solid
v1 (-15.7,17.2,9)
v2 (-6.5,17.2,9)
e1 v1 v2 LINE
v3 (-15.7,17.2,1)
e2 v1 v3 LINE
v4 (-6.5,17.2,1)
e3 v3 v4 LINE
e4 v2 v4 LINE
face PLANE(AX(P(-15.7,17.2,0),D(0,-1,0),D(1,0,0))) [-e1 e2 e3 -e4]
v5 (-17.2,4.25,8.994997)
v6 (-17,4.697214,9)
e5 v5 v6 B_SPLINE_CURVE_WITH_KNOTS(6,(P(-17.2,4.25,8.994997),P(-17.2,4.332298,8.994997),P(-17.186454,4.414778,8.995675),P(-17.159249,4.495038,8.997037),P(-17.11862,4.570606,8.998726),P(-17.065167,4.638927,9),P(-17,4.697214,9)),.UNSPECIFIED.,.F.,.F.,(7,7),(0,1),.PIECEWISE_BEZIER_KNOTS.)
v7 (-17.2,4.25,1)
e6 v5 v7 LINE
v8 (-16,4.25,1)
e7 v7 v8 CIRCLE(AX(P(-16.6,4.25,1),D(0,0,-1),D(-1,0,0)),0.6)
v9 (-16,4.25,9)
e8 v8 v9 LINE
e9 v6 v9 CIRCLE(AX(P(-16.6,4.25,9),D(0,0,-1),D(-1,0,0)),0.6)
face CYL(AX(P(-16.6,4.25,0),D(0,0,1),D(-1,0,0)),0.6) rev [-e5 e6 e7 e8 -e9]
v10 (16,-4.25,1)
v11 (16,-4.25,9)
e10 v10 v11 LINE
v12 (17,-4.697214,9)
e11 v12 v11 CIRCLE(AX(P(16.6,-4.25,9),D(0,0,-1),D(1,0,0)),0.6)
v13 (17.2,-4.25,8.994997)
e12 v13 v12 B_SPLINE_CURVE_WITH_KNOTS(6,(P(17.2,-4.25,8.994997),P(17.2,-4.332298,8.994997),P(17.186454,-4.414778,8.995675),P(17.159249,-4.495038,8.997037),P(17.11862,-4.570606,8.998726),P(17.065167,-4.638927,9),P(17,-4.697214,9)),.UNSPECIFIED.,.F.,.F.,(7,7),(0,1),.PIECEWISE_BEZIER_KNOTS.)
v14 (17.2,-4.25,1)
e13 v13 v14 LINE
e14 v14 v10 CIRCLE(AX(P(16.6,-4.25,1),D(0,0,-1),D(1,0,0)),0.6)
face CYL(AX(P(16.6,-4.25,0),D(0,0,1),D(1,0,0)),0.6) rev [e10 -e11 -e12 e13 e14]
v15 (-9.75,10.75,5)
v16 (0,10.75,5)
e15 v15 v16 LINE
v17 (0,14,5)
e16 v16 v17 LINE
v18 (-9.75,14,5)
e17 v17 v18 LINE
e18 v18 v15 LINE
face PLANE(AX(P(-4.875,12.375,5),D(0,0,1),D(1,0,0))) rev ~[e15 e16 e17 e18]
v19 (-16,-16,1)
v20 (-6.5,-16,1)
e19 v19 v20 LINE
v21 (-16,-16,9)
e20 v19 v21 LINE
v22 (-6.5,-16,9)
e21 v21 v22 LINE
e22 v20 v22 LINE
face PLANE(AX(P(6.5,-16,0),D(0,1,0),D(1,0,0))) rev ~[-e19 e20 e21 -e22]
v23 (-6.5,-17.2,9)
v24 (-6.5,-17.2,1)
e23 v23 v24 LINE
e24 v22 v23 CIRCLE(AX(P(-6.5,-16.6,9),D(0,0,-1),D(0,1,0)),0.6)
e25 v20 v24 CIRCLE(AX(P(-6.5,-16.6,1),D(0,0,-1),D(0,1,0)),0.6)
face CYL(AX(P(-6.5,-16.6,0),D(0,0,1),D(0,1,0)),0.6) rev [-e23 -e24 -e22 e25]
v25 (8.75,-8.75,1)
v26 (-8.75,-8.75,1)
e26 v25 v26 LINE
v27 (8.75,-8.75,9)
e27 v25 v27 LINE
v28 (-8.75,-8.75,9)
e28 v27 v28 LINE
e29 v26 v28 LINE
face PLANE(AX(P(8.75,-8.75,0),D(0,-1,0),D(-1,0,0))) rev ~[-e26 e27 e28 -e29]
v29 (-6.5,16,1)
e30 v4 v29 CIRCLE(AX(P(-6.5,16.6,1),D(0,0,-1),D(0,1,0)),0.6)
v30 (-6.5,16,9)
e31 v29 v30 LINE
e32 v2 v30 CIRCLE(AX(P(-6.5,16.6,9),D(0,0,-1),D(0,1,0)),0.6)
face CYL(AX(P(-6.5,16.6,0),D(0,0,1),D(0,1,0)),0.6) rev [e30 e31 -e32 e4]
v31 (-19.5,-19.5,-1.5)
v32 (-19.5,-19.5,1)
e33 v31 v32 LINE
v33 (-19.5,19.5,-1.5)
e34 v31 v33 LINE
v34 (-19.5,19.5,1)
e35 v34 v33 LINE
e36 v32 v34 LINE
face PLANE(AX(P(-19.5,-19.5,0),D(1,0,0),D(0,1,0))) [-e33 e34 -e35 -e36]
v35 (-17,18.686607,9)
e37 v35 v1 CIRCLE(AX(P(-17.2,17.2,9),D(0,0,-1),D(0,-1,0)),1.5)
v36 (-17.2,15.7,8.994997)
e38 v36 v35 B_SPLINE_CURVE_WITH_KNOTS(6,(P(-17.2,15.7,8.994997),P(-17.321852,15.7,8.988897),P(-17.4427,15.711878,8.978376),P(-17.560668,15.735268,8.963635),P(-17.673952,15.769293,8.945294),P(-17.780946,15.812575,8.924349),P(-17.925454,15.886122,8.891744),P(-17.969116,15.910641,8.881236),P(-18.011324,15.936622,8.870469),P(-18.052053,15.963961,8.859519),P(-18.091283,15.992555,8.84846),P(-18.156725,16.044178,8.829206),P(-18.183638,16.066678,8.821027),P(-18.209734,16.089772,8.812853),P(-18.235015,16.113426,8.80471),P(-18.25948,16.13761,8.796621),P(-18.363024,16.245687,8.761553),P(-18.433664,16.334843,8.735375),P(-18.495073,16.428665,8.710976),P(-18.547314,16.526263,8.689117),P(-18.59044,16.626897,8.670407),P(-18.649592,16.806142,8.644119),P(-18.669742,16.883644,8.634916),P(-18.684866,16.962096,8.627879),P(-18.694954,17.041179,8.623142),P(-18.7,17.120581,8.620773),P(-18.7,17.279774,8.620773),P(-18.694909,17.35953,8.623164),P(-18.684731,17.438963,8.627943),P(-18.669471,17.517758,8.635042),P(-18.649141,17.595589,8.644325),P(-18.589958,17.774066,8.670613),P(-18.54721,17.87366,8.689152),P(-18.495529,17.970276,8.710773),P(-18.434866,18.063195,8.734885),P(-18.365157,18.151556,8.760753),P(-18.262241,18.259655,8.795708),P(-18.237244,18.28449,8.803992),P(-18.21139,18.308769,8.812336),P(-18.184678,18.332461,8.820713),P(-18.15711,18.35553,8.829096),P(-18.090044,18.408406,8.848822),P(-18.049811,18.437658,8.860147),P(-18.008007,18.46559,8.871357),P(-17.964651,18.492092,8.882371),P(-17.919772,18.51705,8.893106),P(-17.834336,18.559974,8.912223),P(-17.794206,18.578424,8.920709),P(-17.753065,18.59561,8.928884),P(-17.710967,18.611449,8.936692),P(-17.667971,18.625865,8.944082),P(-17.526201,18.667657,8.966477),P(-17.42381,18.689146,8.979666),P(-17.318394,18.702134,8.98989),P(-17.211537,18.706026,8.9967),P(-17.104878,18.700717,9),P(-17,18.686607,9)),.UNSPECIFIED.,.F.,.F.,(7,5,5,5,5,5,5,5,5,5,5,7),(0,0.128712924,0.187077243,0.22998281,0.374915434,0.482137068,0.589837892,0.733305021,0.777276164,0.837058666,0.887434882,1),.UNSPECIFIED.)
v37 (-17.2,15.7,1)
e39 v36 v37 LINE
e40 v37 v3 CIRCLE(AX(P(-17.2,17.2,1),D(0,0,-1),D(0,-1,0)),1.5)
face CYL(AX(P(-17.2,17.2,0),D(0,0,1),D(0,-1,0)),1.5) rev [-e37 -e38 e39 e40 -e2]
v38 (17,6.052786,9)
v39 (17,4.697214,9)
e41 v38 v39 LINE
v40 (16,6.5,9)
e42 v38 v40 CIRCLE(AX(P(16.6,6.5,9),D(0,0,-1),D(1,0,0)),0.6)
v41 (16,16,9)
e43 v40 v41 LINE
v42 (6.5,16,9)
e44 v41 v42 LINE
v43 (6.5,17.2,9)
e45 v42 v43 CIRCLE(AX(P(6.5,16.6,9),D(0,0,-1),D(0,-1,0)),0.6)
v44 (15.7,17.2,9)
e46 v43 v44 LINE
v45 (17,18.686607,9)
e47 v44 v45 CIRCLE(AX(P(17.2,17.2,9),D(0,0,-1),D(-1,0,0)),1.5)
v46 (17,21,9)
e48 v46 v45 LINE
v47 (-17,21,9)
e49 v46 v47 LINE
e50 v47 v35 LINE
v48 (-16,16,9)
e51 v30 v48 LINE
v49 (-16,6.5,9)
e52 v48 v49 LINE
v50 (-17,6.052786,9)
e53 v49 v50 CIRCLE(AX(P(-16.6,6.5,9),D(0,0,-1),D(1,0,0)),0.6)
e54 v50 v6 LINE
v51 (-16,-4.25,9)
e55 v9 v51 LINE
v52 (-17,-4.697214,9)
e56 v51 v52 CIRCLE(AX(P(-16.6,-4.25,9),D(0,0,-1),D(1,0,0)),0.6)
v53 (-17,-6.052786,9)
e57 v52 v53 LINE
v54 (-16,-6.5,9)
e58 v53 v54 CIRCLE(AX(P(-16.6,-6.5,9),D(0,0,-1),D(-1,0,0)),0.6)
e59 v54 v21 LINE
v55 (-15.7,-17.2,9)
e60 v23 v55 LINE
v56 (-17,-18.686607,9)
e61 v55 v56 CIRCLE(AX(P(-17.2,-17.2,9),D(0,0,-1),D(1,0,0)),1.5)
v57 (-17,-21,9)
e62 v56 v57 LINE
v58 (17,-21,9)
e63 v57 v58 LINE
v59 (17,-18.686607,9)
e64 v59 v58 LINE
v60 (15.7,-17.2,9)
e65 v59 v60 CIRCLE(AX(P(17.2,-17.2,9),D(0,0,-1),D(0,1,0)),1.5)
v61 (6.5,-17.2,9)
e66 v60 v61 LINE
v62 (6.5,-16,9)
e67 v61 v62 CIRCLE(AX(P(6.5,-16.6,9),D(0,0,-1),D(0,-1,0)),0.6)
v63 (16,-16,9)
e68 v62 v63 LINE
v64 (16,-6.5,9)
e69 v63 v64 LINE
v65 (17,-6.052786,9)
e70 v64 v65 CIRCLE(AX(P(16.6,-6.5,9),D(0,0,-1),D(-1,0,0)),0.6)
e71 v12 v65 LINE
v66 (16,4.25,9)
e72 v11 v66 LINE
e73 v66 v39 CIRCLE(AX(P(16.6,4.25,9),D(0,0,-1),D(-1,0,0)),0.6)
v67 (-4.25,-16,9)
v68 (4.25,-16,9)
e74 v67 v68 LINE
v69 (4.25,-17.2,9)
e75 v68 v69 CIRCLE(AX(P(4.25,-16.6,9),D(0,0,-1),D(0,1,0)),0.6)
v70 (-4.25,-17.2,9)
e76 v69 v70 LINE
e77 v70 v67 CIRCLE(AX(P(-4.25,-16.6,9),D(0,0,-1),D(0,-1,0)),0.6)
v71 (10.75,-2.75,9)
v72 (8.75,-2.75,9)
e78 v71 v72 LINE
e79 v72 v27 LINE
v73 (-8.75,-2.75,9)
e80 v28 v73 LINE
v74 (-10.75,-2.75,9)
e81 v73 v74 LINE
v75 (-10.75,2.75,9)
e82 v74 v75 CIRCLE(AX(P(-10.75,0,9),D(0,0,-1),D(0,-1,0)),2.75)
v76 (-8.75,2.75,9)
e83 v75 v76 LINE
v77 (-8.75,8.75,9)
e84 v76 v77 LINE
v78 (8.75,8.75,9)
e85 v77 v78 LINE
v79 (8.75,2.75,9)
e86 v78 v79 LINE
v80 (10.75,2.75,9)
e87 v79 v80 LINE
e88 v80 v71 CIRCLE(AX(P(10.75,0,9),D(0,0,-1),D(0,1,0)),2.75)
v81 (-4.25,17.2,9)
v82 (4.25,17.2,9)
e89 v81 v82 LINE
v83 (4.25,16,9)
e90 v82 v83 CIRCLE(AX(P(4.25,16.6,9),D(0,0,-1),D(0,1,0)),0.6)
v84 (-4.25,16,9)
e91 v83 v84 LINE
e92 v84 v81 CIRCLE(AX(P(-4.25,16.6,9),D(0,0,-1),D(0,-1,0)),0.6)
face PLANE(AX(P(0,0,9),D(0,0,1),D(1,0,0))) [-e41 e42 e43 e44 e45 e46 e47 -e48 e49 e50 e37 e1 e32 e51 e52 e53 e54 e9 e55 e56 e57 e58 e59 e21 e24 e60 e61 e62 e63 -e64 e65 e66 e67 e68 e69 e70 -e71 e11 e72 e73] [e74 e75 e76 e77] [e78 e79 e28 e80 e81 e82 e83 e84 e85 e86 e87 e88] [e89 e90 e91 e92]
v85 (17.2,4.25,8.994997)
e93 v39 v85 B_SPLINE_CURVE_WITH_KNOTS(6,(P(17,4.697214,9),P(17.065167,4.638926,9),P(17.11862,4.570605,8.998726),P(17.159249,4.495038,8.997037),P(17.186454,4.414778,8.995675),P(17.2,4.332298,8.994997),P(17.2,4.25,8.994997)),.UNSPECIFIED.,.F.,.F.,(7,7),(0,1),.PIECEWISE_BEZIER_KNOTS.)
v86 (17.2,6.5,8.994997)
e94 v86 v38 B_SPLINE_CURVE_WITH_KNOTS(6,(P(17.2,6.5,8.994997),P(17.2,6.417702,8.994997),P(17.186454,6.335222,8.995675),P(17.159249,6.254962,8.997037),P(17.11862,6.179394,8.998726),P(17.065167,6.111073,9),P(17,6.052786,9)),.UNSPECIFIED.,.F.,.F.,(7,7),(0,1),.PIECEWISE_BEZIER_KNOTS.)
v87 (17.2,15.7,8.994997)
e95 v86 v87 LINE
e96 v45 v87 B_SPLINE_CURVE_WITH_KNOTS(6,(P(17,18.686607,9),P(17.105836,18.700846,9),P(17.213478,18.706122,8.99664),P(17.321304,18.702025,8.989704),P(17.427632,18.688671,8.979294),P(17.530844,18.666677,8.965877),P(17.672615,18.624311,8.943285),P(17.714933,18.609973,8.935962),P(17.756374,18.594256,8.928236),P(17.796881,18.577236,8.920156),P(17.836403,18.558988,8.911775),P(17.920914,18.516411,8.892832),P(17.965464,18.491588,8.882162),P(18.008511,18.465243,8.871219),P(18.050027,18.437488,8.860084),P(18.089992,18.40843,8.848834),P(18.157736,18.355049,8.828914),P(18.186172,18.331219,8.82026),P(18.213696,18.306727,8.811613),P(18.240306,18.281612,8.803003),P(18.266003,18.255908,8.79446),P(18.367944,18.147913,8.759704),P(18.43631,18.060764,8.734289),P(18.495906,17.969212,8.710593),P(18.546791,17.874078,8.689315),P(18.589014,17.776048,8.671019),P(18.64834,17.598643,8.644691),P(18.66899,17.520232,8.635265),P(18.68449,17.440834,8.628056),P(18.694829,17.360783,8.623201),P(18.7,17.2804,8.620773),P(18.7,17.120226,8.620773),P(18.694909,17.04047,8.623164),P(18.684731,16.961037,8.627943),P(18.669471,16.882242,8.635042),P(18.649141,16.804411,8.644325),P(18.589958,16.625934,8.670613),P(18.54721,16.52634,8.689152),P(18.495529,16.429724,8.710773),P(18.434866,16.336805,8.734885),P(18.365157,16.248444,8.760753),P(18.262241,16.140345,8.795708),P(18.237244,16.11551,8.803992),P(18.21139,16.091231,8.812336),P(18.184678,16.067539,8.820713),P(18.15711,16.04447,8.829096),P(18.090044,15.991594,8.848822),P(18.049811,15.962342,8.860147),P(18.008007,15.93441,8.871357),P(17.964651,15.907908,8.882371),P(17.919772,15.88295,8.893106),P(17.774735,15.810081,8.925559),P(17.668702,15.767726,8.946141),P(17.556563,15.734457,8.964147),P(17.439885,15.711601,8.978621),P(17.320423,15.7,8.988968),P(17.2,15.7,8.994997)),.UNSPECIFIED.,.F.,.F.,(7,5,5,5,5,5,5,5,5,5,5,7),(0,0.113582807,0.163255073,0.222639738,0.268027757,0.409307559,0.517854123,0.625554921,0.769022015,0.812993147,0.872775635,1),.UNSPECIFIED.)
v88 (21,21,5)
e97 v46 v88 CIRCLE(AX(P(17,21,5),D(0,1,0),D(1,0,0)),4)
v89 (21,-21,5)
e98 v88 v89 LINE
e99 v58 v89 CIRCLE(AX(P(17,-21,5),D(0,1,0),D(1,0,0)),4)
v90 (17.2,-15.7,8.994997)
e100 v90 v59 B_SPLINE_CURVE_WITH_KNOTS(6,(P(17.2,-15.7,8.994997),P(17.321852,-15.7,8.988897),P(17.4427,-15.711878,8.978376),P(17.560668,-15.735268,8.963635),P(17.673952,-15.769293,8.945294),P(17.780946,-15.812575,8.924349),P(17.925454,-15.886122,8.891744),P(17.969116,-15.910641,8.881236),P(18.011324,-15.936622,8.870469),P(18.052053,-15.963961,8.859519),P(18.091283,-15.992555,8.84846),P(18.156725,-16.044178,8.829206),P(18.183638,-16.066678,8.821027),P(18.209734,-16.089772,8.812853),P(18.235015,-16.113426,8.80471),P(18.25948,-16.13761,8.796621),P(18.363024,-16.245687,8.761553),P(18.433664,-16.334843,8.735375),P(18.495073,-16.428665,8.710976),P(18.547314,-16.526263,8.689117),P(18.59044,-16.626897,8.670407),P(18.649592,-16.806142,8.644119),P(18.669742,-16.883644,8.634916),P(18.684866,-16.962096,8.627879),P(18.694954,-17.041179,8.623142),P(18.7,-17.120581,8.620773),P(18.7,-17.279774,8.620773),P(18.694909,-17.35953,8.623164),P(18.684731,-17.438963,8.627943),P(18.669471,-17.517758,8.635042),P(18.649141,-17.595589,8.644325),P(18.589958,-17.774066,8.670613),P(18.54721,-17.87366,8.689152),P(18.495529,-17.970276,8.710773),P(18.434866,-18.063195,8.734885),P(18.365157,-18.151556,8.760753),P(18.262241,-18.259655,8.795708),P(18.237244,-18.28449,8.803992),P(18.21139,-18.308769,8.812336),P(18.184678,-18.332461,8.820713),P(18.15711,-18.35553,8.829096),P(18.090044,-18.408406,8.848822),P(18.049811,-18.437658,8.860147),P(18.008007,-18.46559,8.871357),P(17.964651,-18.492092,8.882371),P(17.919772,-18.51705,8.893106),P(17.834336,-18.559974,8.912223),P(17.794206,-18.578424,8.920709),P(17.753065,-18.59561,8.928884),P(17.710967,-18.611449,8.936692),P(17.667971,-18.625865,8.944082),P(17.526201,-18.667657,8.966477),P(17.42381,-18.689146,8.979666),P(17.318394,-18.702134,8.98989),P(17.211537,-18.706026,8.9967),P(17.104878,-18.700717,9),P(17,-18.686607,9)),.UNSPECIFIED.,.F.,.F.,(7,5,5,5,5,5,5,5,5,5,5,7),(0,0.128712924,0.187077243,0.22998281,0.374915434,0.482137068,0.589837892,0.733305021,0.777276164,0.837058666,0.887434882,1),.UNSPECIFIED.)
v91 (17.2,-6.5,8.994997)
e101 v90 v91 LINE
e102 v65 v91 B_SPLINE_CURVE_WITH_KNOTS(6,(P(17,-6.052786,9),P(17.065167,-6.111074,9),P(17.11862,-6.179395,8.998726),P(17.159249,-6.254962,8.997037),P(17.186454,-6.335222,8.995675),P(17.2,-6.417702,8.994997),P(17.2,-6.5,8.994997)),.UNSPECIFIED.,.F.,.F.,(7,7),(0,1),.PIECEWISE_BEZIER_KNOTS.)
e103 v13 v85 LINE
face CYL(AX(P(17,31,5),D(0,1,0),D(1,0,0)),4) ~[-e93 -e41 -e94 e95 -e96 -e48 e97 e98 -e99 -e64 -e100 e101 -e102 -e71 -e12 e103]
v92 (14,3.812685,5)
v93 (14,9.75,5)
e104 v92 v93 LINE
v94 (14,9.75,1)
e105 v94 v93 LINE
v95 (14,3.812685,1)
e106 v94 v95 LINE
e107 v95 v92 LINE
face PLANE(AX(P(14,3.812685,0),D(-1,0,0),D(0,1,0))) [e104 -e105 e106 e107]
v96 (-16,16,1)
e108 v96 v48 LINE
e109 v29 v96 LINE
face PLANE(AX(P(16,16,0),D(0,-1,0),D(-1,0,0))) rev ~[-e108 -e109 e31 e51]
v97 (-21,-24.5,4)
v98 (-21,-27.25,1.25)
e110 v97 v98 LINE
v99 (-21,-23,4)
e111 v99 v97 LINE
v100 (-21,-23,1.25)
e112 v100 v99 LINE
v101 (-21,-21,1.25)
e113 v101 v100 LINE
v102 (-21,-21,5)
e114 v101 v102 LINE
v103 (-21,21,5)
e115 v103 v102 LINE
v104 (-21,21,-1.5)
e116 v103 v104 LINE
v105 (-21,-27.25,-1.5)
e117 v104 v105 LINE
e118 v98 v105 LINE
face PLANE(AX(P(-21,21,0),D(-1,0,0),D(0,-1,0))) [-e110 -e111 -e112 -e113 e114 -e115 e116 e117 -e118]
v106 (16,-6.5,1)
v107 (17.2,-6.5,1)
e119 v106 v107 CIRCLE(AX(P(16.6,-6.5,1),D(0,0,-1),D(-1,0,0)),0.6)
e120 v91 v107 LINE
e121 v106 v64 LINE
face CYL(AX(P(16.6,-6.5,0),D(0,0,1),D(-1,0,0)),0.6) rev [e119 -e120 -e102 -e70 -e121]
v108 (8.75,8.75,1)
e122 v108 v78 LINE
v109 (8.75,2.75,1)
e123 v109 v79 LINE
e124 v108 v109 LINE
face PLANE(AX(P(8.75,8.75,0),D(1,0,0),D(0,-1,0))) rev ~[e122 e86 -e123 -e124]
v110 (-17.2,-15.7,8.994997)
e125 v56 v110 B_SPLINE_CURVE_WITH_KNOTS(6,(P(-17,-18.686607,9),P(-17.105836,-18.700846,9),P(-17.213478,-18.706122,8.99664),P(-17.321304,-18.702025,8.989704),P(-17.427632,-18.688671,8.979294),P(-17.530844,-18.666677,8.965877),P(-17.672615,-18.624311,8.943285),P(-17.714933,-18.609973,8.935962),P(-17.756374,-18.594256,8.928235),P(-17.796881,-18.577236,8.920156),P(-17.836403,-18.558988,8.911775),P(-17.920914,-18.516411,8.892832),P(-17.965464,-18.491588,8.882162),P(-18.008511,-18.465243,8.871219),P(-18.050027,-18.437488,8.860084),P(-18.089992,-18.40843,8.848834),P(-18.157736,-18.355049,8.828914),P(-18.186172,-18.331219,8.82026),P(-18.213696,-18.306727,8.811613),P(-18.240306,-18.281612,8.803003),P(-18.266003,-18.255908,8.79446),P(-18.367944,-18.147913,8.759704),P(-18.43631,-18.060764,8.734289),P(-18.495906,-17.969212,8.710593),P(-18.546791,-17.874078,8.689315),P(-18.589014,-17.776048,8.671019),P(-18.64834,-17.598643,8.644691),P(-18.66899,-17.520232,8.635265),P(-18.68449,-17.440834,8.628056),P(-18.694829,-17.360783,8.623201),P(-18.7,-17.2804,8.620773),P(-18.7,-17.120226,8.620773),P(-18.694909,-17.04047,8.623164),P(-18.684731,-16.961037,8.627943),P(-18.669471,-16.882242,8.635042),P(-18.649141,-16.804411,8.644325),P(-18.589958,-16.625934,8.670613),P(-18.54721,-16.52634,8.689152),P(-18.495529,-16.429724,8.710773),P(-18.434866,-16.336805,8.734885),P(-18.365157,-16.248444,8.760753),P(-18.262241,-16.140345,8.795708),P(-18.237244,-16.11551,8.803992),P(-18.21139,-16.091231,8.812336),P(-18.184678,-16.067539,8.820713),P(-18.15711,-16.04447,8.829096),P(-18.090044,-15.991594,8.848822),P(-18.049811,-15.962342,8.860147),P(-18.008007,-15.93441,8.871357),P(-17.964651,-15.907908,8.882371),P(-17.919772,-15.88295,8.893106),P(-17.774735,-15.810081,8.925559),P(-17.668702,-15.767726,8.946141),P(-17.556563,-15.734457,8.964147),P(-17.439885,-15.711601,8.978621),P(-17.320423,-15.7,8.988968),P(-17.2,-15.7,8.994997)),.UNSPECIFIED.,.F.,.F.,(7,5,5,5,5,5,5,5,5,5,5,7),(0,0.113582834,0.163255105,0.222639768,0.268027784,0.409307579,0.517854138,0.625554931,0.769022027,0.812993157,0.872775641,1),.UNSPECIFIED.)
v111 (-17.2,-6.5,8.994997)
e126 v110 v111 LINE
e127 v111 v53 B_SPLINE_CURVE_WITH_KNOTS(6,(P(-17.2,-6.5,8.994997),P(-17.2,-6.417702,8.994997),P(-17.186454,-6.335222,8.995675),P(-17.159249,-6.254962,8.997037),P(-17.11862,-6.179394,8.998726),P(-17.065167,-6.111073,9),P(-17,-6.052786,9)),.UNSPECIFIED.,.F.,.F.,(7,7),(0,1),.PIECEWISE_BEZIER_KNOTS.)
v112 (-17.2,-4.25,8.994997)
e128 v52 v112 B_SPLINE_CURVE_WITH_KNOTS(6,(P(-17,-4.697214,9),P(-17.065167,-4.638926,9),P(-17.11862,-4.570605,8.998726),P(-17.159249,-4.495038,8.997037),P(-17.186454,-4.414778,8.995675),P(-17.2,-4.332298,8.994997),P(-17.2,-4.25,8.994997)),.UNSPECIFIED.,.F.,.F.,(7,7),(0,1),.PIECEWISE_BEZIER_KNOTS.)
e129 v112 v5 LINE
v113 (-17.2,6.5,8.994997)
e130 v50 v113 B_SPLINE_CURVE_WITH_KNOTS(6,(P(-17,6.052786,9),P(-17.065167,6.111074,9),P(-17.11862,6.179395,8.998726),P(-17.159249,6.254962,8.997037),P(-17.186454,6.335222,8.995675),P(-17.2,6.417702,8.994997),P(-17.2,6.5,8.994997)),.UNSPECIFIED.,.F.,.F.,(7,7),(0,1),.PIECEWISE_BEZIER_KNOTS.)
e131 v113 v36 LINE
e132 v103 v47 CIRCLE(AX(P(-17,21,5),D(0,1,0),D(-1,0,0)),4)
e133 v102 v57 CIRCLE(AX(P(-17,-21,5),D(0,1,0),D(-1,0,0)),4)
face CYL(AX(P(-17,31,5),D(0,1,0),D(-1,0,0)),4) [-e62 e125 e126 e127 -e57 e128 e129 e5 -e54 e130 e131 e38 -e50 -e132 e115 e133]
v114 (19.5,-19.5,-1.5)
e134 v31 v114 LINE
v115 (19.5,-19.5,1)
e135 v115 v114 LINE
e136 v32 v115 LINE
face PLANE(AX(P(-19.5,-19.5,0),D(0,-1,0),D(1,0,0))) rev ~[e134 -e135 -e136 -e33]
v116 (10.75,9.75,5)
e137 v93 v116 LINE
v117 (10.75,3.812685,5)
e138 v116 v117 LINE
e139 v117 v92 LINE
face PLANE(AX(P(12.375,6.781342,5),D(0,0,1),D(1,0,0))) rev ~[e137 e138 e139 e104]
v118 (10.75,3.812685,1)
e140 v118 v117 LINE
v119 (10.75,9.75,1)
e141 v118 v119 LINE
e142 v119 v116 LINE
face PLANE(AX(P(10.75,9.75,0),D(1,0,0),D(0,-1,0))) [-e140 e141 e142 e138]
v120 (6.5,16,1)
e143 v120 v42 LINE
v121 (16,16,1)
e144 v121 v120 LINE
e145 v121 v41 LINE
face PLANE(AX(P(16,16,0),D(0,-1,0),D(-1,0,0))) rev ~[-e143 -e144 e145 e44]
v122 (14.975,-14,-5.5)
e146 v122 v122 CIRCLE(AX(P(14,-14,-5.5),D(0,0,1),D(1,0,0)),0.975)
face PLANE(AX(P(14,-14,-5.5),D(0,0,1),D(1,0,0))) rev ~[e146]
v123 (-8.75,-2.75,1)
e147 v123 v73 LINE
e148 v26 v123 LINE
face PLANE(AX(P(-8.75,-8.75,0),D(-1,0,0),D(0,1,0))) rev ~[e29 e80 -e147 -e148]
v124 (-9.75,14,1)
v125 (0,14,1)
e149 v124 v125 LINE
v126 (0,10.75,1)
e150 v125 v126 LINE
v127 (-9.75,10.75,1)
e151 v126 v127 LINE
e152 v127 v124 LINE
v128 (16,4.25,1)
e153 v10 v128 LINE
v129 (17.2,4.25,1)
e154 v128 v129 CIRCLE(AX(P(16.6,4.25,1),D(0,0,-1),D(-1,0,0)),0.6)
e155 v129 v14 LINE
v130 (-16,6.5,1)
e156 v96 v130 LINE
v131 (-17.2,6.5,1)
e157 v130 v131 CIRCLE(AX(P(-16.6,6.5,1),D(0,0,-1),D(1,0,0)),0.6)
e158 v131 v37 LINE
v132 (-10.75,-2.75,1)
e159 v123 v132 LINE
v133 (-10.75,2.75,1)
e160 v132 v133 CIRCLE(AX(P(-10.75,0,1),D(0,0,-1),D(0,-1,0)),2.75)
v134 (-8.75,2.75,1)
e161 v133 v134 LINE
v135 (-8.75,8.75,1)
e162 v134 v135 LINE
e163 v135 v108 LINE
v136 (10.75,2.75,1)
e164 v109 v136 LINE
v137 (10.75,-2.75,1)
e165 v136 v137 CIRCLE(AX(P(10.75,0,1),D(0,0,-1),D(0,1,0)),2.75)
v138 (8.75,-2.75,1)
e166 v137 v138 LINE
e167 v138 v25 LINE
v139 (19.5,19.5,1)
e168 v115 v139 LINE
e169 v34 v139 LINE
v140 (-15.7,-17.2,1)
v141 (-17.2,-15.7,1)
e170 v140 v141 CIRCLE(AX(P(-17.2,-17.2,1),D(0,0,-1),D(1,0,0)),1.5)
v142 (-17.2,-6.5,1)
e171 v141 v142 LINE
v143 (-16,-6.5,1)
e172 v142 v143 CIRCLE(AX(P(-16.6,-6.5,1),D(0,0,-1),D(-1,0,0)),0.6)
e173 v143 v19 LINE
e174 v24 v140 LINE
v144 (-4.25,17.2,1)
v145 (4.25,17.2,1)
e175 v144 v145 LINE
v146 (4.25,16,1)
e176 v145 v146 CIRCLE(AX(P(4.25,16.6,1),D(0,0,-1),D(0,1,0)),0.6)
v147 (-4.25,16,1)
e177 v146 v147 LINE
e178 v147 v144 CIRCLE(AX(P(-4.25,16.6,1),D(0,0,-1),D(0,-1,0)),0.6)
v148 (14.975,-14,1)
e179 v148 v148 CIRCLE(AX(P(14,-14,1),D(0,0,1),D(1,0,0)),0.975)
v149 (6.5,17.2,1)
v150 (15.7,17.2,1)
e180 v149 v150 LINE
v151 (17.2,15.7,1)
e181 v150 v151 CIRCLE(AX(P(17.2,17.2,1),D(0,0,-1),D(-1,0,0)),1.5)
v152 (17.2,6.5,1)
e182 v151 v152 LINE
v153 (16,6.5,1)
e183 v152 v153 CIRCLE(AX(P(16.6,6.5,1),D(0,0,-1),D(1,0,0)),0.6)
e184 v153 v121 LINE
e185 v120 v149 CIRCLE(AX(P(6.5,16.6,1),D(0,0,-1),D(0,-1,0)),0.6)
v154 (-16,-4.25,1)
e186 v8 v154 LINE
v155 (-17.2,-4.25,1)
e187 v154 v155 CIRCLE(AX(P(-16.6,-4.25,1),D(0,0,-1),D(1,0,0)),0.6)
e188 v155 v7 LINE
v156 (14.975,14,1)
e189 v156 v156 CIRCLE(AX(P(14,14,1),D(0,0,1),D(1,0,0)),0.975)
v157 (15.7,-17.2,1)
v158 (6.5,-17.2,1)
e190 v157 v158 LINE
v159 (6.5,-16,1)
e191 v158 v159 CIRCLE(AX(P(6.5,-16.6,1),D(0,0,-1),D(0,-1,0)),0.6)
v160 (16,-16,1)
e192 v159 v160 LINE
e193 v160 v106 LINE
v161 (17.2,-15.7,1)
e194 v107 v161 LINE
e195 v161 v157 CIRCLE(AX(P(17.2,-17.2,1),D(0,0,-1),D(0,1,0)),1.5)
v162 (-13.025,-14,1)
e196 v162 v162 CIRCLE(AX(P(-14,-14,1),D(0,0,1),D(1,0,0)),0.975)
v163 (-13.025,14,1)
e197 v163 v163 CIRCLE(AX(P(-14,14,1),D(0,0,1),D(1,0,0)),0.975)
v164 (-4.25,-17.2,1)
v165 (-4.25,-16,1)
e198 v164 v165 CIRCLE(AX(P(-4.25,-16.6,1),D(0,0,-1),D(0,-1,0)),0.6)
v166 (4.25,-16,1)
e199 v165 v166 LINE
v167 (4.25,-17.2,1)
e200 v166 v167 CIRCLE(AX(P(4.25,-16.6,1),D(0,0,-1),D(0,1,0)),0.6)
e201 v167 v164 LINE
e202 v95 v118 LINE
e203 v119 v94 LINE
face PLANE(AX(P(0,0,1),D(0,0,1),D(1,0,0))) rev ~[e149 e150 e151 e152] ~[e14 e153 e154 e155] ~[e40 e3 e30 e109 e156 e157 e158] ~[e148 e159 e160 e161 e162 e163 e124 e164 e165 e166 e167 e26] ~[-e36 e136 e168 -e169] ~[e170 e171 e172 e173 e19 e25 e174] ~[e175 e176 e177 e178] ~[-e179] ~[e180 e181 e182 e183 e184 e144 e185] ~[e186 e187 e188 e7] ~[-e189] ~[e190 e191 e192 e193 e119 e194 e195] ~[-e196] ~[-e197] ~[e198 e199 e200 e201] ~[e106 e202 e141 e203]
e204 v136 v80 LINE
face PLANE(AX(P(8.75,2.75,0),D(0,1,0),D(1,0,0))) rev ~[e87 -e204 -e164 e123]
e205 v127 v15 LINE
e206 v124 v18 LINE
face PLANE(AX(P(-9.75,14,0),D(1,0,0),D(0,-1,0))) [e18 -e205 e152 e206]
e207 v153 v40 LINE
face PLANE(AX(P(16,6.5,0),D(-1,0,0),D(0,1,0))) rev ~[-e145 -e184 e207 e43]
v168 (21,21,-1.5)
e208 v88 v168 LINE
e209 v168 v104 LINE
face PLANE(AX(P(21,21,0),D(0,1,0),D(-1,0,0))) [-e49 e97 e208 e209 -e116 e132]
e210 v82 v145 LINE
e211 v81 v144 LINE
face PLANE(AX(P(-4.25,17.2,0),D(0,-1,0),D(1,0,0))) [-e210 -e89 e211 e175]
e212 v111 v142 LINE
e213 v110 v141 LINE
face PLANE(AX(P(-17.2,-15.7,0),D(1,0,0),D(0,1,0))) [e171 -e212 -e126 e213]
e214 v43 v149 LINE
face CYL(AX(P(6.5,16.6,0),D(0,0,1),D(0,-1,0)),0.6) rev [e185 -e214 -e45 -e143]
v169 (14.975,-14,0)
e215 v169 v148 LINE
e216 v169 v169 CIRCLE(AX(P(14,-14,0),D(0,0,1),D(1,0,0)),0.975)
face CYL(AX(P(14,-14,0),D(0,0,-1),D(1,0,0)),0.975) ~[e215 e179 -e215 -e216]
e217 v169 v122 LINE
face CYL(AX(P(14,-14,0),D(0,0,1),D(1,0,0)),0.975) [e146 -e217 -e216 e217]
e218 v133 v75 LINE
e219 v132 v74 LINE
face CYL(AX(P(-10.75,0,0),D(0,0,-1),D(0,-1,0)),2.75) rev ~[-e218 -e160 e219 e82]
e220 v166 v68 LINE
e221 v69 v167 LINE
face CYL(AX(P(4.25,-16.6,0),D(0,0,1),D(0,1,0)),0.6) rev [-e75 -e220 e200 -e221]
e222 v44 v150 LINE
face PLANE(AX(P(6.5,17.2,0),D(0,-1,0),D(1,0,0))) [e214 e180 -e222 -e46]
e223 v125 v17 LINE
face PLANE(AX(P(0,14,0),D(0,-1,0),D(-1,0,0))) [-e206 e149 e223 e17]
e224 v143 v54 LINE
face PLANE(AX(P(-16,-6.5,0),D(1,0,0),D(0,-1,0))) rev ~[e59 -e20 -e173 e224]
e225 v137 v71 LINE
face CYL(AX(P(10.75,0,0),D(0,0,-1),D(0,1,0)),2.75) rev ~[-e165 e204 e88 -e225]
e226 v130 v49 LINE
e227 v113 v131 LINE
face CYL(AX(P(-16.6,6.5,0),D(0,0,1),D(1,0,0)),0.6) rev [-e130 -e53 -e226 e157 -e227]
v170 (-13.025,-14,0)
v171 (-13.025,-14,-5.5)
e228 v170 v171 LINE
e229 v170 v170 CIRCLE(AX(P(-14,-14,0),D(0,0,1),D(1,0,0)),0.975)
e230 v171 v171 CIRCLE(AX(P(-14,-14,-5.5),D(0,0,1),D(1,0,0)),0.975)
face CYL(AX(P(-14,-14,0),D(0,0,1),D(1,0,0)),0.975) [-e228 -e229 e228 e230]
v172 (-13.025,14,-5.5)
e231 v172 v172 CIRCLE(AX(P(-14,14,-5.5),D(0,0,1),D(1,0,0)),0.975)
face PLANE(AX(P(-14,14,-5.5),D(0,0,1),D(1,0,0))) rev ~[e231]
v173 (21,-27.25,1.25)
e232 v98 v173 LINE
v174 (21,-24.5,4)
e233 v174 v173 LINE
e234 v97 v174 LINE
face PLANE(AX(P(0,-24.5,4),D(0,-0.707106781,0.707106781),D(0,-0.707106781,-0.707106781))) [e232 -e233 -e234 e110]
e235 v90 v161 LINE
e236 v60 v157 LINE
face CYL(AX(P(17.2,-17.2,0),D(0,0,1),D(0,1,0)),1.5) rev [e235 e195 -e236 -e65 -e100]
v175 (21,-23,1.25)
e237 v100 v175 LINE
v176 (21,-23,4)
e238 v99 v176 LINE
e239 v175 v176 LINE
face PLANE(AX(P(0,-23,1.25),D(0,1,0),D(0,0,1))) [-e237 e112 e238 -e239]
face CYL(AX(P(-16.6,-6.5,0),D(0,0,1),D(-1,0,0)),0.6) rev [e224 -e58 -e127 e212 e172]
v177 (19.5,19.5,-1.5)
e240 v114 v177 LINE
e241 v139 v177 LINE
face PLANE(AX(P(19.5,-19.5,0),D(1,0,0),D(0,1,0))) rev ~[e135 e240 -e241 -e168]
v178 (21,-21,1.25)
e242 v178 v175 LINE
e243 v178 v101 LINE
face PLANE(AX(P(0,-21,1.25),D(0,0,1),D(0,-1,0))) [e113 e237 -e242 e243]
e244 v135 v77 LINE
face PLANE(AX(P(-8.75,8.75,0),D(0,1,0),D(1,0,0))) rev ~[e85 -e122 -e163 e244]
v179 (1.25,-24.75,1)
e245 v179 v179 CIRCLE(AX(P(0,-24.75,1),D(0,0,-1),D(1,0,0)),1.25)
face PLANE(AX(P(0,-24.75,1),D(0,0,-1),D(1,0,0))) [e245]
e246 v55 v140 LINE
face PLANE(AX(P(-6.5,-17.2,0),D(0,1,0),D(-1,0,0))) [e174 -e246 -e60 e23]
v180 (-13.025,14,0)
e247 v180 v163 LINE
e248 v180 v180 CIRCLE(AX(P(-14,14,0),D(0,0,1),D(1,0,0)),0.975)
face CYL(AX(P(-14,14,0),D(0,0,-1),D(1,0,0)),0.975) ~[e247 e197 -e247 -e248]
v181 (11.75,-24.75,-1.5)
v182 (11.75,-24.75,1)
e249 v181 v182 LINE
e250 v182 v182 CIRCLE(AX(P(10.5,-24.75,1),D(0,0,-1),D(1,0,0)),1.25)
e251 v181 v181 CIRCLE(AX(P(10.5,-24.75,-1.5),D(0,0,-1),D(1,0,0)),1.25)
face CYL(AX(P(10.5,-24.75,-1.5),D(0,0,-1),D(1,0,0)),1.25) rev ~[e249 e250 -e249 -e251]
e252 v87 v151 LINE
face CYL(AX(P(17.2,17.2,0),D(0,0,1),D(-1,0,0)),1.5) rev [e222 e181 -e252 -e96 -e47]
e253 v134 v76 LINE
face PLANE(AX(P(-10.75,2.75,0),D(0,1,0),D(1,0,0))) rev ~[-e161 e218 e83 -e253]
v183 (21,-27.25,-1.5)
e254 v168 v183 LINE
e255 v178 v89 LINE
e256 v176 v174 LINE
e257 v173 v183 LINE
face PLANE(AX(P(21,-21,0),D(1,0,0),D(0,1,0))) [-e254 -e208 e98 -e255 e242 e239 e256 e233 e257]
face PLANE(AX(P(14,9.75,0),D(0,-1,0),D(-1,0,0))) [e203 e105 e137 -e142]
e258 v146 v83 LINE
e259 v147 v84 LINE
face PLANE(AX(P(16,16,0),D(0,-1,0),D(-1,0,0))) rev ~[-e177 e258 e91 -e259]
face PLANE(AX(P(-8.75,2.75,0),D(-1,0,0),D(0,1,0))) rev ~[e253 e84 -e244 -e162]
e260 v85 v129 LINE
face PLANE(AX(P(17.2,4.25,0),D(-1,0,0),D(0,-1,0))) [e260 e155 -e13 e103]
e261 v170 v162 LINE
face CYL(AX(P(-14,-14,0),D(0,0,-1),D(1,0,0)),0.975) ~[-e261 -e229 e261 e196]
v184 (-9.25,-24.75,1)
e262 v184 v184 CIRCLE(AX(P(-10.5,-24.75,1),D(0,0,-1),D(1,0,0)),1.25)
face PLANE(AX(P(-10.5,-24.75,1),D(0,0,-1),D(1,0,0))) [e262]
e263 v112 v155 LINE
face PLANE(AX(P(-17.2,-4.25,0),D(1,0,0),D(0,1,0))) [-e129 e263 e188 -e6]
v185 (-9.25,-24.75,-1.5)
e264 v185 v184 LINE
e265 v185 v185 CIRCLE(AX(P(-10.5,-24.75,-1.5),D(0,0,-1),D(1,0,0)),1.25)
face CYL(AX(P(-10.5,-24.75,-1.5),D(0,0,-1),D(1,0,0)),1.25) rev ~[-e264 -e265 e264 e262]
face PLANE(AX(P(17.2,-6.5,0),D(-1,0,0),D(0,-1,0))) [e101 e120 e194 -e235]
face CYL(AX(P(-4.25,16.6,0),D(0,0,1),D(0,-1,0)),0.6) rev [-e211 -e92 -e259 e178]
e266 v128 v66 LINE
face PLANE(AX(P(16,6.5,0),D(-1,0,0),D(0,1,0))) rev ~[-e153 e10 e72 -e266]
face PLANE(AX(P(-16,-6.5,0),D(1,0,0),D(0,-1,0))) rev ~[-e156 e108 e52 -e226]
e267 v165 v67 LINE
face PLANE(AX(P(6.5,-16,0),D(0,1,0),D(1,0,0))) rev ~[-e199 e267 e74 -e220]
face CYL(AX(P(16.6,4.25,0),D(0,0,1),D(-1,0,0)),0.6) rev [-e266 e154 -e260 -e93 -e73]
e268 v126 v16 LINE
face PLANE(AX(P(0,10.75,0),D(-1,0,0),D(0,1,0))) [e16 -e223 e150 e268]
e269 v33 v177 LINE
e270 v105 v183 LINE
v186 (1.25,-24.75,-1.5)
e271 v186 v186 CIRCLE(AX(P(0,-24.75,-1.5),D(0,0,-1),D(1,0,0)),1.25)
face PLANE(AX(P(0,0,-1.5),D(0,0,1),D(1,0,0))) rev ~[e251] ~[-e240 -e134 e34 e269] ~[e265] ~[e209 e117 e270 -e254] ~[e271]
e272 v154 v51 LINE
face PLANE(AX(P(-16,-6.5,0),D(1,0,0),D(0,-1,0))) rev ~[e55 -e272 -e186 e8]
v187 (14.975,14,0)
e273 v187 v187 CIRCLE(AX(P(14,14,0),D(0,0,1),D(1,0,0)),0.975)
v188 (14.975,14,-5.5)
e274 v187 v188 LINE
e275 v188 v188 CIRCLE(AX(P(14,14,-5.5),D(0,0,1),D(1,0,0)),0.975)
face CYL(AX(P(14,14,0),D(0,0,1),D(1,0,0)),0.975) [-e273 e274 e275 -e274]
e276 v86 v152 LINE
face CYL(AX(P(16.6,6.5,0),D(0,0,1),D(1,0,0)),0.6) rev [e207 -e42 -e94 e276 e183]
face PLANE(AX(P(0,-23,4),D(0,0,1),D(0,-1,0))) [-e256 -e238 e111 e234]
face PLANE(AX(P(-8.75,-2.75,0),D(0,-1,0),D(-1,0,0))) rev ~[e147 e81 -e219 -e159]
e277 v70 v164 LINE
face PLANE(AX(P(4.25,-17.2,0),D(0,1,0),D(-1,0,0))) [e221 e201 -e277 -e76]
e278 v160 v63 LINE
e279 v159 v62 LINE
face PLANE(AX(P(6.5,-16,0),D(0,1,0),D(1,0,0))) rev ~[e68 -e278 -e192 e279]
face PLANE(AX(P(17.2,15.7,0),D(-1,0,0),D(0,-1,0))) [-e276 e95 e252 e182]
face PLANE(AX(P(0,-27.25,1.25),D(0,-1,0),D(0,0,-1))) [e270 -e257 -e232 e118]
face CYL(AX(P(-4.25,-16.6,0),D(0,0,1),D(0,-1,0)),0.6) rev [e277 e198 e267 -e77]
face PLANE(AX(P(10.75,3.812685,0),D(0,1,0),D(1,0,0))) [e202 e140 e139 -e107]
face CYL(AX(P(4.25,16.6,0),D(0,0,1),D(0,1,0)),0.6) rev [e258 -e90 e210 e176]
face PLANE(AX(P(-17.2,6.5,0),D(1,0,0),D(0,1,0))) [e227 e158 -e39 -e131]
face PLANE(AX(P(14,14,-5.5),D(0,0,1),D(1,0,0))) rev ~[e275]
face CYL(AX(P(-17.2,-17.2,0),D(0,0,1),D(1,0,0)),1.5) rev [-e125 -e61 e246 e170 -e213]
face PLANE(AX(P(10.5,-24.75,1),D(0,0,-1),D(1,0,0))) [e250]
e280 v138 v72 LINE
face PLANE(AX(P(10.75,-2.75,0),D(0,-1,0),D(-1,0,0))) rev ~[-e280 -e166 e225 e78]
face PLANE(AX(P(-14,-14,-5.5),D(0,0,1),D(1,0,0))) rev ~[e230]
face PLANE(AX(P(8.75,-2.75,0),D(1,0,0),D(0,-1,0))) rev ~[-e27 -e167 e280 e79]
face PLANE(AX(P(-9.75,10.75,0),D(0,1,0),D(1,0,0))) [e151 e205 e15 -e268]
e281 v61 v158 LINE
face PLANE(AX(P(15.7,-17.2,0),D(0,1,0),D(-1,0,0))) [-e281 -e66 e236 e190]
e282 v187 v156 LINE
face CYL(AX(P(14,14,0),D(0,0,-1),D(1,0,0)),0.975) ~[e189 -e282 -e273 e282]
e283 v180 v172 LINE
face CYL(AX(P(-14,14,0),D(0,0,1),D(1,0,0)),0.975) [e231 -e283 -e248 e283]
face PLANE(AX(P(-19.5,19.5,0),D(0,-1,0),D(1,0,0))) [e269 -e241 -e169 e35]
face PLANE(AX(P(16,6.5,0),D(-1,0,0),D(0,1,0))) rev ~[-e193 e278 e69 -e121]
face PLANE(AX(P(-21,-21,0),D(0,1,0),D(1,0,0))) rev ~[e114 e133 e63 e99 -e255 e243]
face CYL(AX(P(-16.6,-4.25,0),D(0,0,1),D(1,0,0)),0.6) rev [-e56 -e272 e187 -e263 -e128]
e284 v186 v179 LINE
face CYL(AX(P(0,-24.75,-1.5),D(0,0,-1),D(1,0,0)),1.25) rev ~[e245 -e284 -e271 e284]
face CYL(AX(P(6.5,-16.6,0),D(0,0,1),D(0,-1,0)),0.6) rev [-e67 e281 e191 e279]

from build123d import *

# Parameters (mm, degrees)
F0_W        = 39
F0_H        = 39
F0_R        = 0.975
F1_DEPTH    = 9
F2_T1_DEPTH = 62
F4_DEPTH    = 21
F5_DEPTH    = 21
F6_DEPTH    = 5.5
F7_DEPTH    = 1.5
F8_DEPTH    = 2.5
F9_DEPTH    = 1.5
F10_R       = 1.25
F11_DEPTH   = 2.5
F12_DEPTH   = 5
F13_DEPTH   = 1


# Not quite as in the source:
# - a fillet or chamfer that OpenCascade refuses, or shapes differently, is made with other operations: its cross-section is extruded or revolved along the edge and cut away or added


with BuildPart() as f1:
    # F0 (on Top) → F1 (new body)
    with BuildSketch(Plane.XY):
        Polygon((-2.625, 21), (-21, 21), (-21, -21), (-2.625, -21), (2.625, -21), (21, -21), (21, 21), (2.625, 21), align=None)
        Rectangle(F0_W, F0_H, mode=Mode.SUBTRACT)
        Rectangle(F0_W, F0_H)
        with BuildLine():
            ThreePointArc((16, 4.25), (16.6, 4.85), (17.2, 4.25))
            Line((17.2, 4.25), (17.2, -4.25))
            ThreePointArc((17.2, -4.25), (16.6, -4.85), (16, -4.25))
            Line((16, -4.25), (16, -6.5))
            ThreePointArc((16, -6.5), (16.6, -5.9), (17.2, -6.5))
            Line((17.2, -6.5), (17.2, -15.7))
            ThreePointArc((17.2, -15.7), (18.2606601718, -18.2606601718), (15.7, -17.2))
            Line((15.7, -17.2), (6.5, -17.2))
            ThreePointArc((6.5, -17.2), (5.9, -16.6), (6.5, -16))
            Line((6.5, -16), (4.25, -16))
            ThreePointArc((4.25, -16), (4.85, -16.6), (4.25, -17.2))
            Line((4.25, -17.2), (-4.25, -17.2))
            ThreePointArc((-4.25, -17.2), (-4.85, -16.6), (-4.25, -16))
            Line((-4.25, -16), (-6.5, -16))
            ThreePointArc((-6.5, -16), (-5.9, -16.6), (-6.5, -17.2))
            Line((-6.5, -17.2), (-15.7, -17.2))
            ThreePointArc((-15.7, -17.2), (-18.2606601718, -18.2606601718), (-17.2, -15.7))
            Line((-17.2, -15.7), (-17.2, -6.5))
            ThreePointArc((-17.2, -6.5), (-16.6, -5.9), (-16, -6.5))
            Line((-16, -6.5), (-16, -4.25))
            ThreePointArc((-16, -4.25), (-16.6, -4.85), (-17.2, -4.25))
            Line((-17.2, -4.25), (-17.2, 4.25))
            ThreePointArc((-17.2, 4.25), (-16.6, 4.85), (-16, 4.25))
            Line((-16, 4.25), (-16, 6.5))
            ThreePointArc((-16, 6.5), (-16.6, 5.9), (-17.2, 6.5))
            Line((-17.2, 6.5), (-17.2, 15.7))
            ThreePointArc((-17.2, 15.7), (-18.2606601718, 18.2606601718), (-15.7, 17.2))
            Line((-15.7, 17.2), (-6.5, 17.2))
            ThreePointArc((-6.5, 17.2), (-5.9, 16.6), (-6.5, 16))
            Line((-6.5, 16), (-4.25, 16))
            ThreePointArc((-4.25, 16), (-4.85, 16.6), (-4.25, 17.2))
            Line((-4.25, 17.2), (4.25, 17.2))
            ThreePointArc((4.25, 17.2), (4.85, 16.6), (4.25, 16))
            Line((4.25, 16), (6.5, 16))
            ThreePointArc((6.5, 16), (5.9, 16.6), (6.5, 17.2))
            Line((6.5, 17.2), (15.7, 17.2))
            ThreePointArc((15.7, 17.2), (18.2606601718, 18.2606601718), (17.2, 15.7))
            Line((17.2, 15.7), (17.2, 6.5))
            ThreePointArc((17.2, 6.5), (16.6, 5.9), (16, 6.5))
            Line((16, 6.5), (16, 4.25))
        make_face(mode=Mode.SUBTRACT)
        Polygon((16, -4.25), (16, 4.25), (16, 6.5), (16, 16), (6.5, 16), (4.25, 16), (-4.25, 16), (-6.5, 16), (-16, 16), (-16, 6.5), (-16, 4.25), (-16, -4.25), (-16, -6.5), (-16, -16), (-6.5, -16), (-4.25, -16), (4.25, -16), (6.5, -16), (16, -16), (16, -6.5), align=None)
        with Locations((-14, -14)):
            Circle(F0_R, mode=Mode.SUBTRACT)
        with Locations((14, -14)):
            Circle(F0_R, mode=Mode.SUBTRACT)
        with Locations((-14, 14)):
            Circle(F0_R, mode=Mode.SUBTRACT)
        Polygon((-8.75, 14), (0, 14), (0, 10.75), (-8.75, 10.75), (-9.75, 10.75), (-9.75, 14), align=None, mode=Mode.SUBTRACT)
        with BuildLine():
            Line((-8.75, 8.75), (8.75, 8.75))
            Line((8.75, 8.75), (8.75, 2.75))
            Line((8.75, 2.75), (10.75, 2.75))
            ThreePointArc((10.75, 2.75), (13.5, 0), (10.75, -2.75))
            Line((10.75, -2.75), (8.75, -2.75))
            Line((8.75, -2.75), (8.75, -8.75))
            Line((8.75, -8.75), (-8.75, -8.75))
            Line((-8.75, -8.75), (-8.75, -2.75))
            Line((-8.75, -2.75), (-10.75, -2.75))
            ThreePointArc((-10.75, -2.75), (-13.5, 0), (-10.75, 2.75))
            Line((-10.75, 2.75), (-8.75, 2.75))
            Line((-8.75, 2.75), (-8.75, 8.75))
        make_face(mode=Mode.SUBTRACT)
        Polygon((10.75, 3.8126846775), (10.75, 8.75), (10.75, 9.75), (14, 9.75), (14, 8.75), (14, 3.8126846775), align=None, mode=Mode.SUBTRACT)
        with Locations((14, 14)):
            Circle(F0_R, mode=Mode.SUBTRACT)
        Polygon((0, 10.75), (0, 14), (-8.75, 14), (-9.75, 14), (-9.75, 10.75), (-8.75, 10.75), align=None)
        Polygon((10.75, 9.75), (10.75, 8.75), (10.75, 3.8126846775), (14, 3.8126846775), (14, 8.75), (14, 9.75), align=None)
        with Locations((14, -14)):
            Circle(F0_R)
        with Locations((-14, -14)):
            Circle(F0_R)
        with Locations((-14, 14)):
            Circle(F0_R)
        with Locations((14, 14)):
            Circle(F0_R)
    extrude(amount=F1_DEPTH)

    # F2: fillet of radius 4 on 2 edges, made by hand

    # F2_s2 → F2_t1 (cut)
    with BuildSketch(Plane.XZ.offset(-31)):
        with BuildLine():
            ThreePointArc((-21, 5), (-19.8284271247, 7.8284271247), (-17, 9))
            Line((-17, 9), (-21, 9))
            Line((-21, 9), (-21, 5))
        make_face()
        with BuildLine():
            ThreePointArc((21, 5), (19.8284271247, 7.8284271247), (17, 9))
            Line((17, 9), (21, 9))
            Line((21, 9), (21, 5))
        make_face()
    extrude(amount=F2_T1_DEPTH, mode=Mode.SUBTRACT)

    # F3 (on Right) → F4 (join)
    with BuildSketch(Plane.YZ):
        Polygon((-21, 0), (-21, 1.25), (-23, 1.25), (-23, 4), (-24.5, 4), (-27.25, 1.25), (-27.25, -1.5), (-23, -1.5), (-21, -1.5), align=None)
    extrude(amount=F4_DEPTH)

    # F5 (add): a face of the model
    f5_faces = [f1.faces().sort_by_distance(p)[0] for p in [
        (0, -24.2579908676, 0.6723744292),
    ]]
    extrude(f5_faces, amount=F5_DEPTH)

    # F0 (on Top) → F6 (join)
    with BuildSketch(Plane.XY):
        with Locations((-14, -14)):
            Circle(F0_R)
        with Locations((14, -14)):
            Circle(F0_R)
        with Locations((-14, 14)):
            Circle(F0_R)
        with Locations((14, 14)):
            Circle(F0_R)
    extrude(amount=-F6_DEPTH)

    # F0 (on Top) → F7 (join)
    with BuildSketch(Plane.XY):
        Rectangle(F0_W, F0_H)
        with BuildLine():
            ThreePointArc((16, 4.25), (16.6, 4.85), (17.2, 4.25))
            Line((17.2, 4.25), (17.2, -4.25))
            ThreePointArc((17.2, -4.25), (16.6, -4.85), (16, -4.25))
            Line((16, -4.25), (16, -6.5))
            ThreePointArc((16, -6.5), (16.6, -5.9), (17.2, -6.5))
            Line((17.2, -6.5), (17.2, -15.7))
            ThreePointArc((17.2, -15.7), (18.2606601718, -18.2606601718), (15.7, -17.2))
            Line((15.7, -17.2), (6.5, -17.2))
            ThreePointArc((6.5, -17.2), (5.9, -16.6), (6.5, -16))
            Line((6.5, -16), (4.25, -16))
            ThreePointArc((4.25, -16), (4.85, -16.6), (4.25, -17.2))
            Line((4.25, -17.2), (-4.25, -17.2))
            ThreePointArc((-4.25, -17.2), (-4.85, -16.6), (-4.25, -16))
            Line((-4.25, -16), (-6.5, -16))
            ThreePointArc((-6.5, -16), (-5.9, -16.6), (-6.5, -17.2))
            Line((-6.5, -17.2), (-15.7, -17.2))
            ThreePointArc((-15.7, -17.2), (-18.2606601718, -18.2606601718), (-17.2, -15.7))
            Line((-17.2, -15.7), (-17.2, -6.5))
            ThreePointArc((-17.2, -6.5), (-16.6, -5.9), (-16, -6.5))
            Line((-16, -6.5), (-16, -4.25))
            ThreePointArc((-16, -4.25), (-16.6, -4.85), (-17.2, -4.25))
            Line((-17.2, -4.25), (-17.2, 4.25))
            ThreePointArc((-17.2, 4.25), (-16.6, 4.85), (-16, 4.25))
            Line((-16, 4.25), (-16, 6.5))
            ThreePointArc((-16, 6.5), (-16.6, 5.9), (-17.2, 6.5))
            Line((-17.2, 6.5), (-17.2, 15.7))
            ThreePointArc((-17.2, 15.7), (-18.2606601718, 18.2606601718), (-15.7, 17.2))
            Line((-15.7, 17.2), (-6.5, 17.2))
            ThreePointArc((-6.5, 17.2), (-5.9, 16.6), (-6.5, 16))
            Line((-6.5, 16), (-4.25, 16))
            ThreePointArc((-4.25, 16), (-4.85, 16.6), (-4.25, 17.2))
            Line((-4.25, 17.2), (4.25, 17.2))
            ThreePointArc((4.25, 17.2), (4.85, 16.6), (4.25, 16))
            Line((4.25, 16), (6.5, 16))
            ThreePointArc((6.5, 16), (5.9, 16.6), (6.5, 17.2))
            Line((6.5, 17.2), (15.7, 17.2))
            ThreePointArc((15.7, 17.2), (18.2606601718, 18.2606601718), (17.2, 15.7))
            Line((17.2, 15.7), (17.2, 6.5))
            ThreePointArc((17.2, 6.5), (16.6, 5.9), (16, 6.5))
            Line((16, 6.5), (16, 4.25))
        make_face(mode=Mode.SUBTRACT)
    extrude(amount=-F7_DEPTH)

    # F8 (cut): a face of the model
    f8_faces = [f1.faces().sort_by_distance(p)[0] for p in [
        (-18.9484567107, 0, -1.5),
    ]]
    extrude(f8_faces, amount=-F8_DEPTH, mode=Mode.SUBTRACT)

    # F0 (on Top) → F9 (join)
    with BuildSketch(Plane.XY):
        Polygon((-2.625, 21), (-21, 21), (-21, -21), (-2.625, -21), (2.625, -21), (21, -21), (21, 21), (2.625, 21), align=None)
        Rectangle(F0_W, F0_H, mode=Mode.SUBTRACT)
    extrude(amount=-F9_DEPTH)

    # F10 (on face) → F11 (cut)
    with BuildSketch(Plane(origin=(0, 0, -1.5), x_dir=(1, 0, 0), z_dir=(0, 0, -1))):
        with Locations((10.5, 24.75)):
            Circle(F10_R)
        with Locations((0, 24.75)):
            Circle(F10_R)
        with Locations((-10.5, 24.75)):
            Circle(F10_R)
    extrude(amount=-F11_DEPTH, mode=Mode.SUBTRACT)

    # F0 (on Top) → F12 (cut)
    with BuildSketch(Plane.XY):
        Polygon((10.75, 9.75), (10.75, 8.75), (10.75, 3.8126846775), (14, 3.8126846775), (14, 8.75), (14, 9.75), align=None)
        Polygon((0, 10.75), (0, 14), (-8.75, 14), (-9.75, 14), (-9.75, 10.75), (-8.75, 10.75), align=None)
    extrude(amount=F12_DEPTH, mode=Mode.SUBTRACT)

    # F0 (on Top) → F13 (cut)
    with BuildSketch(Plane.XY):
        Polygon((16, -4.25), (16, 4.25), (16, 6.5), (16, 16), (6.5, 16), (4.25, 16), (-4.25, 16), (-6.5, 16), (-16, 16), (-16, 6.5), (-16, 4.25), (-16, -4.25), (-16, -6.5), (-16, -16), (-6.5, -16), (-4.25, -16), (4.25, -16), (6.5, -16), (16, -16), (16, -6.5), align=None)
        with Locations((-14, -14)):
            Circle(F0_R, mode=Mode.SUBTRACT)
        with Locations((14, -14)):
            Circle(F0_R, mode=Mode.SUBTRACT)
        with Locations((-14, 14)):
            Circle(F0_R, mode=Mode.SUBTRACT)
        Polygon((-8.75, 14), (0, 14), (0, 10.75), (-8.75, 10.75), (-9.75, 10.75), (-9.75, 14), align=None, mode=Mode.SUBTRACT)
        with BuildLine():
            Line((-8.75, 8.75), (8.75, 8.75))
            Line((8.75, 8.75), (8.75, 2.75))
            Line((8.75, 2.75), (10.75, 2.75))
            ThreePointArc((10.75, 2.75), (13.5, 0), (10.75, -2.75))
            Line((10.75, -2.75), (8.75, -2.75))
            Line((8.75, -2.75), (8.75, -8.75))
            Line((8.75, -8.75), (-8.75, -8.75))
            Line((-8.75, -8.75), (-8.75, -2.75))
            Line((-8.75, -2.75), (-10.75, -2.75))
            ThreePointArc((-10.75, -2.75), (-13.5, 0), (-10.75, 2.75))
            Line((-10.75, 2.75), (-8.75, 2.75))
            Line((-8.75, 2.75), (-8.75, 8.75))
        make_face(mode=Mode.SUBTRACT)
        Polygon((10.75, 3.8126846775), (10.75, 8.75), (10.75, 9.75), (14, 9.75), (14, 8.75), (14, 3.8126846775), align=None, mode=Mode.SUBTRACT)
        with Locations((14, 14)):
            Circle(F0_R, mode=Mode.SUBTRACT)
    extrude(amount=F13_DEPTH, mode=Mode.SUBTRACT)


solid = f1.part
